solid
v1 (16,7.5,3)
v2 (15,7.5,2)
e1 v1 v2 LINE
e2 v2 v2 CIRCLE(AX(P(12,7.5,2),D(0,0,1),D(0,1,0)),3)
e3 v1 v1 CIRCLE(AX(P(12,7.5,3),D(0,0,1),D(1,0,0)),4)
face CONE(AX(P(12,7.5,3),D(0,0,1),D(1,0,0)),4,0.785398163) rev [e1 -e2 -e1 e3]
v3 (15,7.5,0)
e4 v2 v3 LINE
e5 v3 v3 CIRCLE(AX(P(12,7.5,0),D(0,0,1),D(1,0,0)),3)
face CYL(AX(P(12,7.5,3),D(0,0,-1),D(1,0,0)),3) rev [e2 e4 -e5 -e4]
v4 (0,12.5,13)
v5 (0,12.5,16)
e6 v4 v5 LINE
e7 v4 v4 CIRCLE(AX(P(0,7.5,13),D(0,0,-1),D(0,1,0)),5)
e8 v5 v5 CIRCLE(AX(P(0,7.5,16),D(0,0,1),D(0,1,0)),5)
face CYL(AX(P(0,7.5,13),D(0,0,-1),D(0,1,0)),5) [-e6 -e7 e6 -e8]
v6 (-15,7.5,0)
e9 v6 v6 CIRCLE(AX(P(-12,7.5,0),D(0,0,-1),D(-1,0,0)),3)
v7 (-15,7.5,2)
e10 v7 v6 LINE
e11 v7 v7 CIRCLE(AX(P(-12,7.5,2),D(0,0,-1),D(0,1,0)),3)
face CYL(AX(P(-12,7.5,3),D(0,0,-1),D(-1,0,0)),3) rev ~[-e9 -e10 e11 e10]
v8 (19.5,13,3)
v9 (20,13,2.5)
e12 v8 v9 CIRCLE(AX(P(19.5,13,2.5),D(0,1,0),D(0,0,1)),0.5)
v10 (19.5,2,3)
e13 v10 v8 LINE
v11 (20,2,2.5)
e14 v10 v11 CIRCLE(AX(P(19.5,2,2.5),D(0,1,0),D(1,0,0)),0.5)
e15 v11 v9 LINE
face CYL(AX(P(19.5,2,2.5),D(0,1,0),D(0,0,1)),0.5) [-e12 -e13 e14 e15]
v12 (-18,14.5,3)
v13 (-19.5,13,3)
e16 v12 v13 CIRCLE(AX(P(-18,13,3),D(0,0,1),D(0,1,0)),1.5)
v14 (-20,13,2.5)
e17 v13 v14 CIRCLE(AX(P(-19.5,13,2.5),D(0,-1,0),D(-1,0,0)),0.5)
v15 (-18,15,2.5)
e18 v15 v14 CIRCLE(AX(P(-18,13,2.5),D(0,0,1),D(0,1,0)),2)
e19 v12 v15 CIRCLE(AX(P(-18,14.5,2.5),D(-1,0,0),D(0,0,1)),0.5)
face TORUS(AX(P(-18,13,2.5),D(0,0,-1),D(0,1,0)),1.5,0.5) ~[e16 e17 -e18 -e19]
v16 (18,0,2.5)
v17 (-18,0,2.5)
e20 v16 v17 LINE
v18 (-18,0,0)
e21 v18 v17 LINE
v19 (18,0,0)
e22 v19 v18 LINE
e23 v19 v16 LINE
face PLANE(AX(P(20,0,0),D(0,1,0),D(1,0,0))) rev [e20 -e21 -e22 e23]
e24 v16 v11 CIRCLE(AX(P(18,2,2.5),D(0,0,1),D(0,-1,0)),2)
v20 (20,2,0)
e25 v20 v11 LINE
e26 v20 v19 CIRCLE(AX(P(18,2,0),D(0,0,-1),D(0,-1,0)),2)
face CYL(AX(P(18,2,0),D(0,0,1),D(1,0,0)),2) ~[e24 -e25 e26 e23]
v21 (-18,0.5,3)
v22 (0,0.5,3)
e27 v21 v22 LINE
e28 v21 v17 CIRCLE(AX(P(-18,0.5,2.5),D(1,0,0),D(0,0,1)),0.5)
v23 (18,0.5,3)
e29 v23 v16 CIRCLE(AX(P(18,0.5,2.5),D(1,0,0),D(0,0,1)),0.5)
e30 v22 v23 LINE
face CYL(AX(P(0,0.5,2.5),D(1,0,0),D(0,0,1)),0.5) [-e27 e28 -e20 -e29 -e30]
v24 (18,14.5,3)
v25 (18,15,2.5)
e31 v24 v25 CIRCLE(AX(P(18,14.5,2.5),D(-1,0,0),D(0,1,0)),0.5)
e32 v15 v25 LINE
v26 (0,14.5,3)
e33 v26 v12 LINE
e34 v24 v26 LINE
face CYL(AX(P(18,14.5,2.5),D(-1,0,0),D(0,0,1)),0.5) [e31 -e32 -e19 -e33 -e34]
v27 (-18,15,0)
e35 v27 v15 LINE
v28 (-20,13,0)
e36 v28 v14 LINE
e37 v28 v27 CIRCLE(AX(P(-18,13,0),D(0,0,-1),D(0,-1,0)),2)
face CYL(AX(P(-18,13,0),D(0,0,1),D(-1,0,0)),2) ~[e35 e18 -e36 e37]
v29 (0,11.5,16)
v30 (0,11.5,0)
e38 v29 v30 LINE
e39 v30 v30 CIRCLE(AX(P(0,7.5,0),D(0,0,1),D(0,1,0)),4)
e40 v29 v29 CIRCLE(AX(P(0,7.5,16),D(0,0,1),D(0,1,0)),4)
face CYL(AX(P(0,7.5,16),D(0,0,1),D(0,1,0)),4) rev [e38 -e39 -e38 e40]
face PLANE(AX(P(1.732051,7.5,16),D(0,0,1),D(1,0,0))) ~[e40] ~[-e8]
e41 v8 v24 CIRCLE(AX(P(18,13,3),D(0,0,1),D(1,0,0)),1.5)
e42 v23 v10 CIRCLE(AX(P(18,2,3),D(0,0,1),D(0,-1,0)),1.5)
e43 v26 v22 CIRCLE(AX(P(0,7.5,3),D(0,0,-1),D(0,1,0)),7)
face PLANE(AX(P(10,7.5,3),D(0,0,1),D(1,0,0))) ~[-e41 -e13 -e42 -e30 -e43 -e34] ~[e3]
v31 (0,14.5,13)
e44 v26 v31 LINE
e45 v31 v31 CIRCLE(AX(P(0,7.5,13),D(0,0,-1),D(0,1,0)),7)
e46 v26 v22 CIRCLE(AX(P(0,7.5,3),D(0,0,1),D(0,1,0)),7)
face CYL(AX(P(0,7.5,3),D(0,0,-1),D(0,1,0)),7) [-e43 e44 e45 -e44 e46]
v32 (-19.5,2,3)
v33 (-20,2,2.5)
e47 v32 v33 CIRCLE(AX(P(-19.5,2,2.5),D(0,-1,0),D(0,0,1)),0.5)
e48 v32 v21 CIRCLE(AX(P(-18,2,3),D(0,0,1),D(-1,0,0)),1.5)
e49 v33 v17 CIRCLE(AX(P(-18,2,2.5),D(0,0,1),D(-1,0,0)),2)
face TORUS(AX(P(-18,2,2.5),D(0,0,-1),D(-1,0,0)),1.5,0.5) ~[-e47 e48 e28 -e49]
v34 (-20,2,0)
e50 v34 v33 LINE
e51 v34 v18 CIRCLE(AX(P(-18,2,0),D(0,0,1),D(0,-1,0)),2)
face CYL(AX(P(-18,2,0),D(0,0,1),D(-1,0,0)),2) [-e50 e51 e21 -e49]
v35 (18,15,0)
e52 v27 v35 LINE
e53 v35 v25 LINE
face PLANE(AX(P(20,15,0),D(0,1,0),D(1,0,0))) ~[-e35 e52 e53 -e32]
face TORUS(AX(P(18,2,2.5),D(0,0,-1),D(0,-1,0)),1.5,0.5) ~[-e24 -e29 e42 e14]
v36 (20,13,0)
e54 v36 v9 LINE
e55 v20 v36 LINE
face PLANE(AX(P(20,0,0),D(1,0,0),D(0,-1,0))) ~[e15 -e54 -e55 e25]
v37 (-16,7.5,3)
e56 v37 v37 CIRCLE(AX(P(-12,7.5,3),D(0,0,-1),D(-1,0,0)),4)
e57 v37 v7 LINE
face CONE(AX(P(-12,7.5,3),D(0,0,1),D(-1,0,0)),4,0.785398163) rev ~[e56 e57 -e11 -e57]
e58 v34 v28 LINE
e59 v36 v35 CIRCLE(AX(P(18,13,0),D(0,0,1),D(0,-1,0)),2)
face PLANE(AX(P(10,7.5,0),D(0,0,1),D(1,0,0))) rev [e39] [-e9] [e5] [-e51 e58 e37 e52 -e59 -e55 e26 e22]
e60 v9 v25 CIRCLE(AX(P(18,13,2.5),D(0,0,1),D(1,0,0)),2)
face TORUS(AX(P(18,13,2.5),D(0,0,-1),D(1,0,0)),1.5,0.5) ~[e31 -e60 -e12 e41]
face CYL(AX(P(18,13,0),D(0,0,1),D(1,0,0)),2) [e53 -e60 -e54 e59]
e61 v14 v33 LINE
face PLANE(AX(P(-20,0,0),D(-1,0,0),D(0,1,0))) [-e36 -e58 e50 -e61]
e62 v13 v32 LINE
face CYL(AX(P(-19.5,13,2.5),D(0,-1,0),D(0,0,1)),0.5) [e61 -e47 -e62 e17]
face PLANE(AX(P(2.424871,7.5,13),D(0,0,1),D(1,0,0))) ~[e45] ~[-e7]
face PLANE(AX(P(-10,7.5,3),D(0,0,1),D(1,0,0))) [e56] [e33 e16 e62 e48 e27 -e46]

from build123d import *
from build123d import SkipClean  # not in build123d's __all__

# Parameters (mm, degrees)
F0_W           = 20
F0_H           = 15
F1_DEPTH       = 3
F3_DEPTH       = 10
F5_DEPTH       = 3
F7_DEPTH       = 25
F9_D           = 6
F9_CSINK_D     = 8
F9_CSINK_ANGLE = 90
F10_R          = 2
F12_R          = 0.5


with BuildPart() as f1:
    # F0 (on Top) → F1 (new body)
    with BuildSketch(Plane.XY):
        with Locations((-10, 7.5)):
            Rectangle(F0_W, F0_H)
    extrude(amount=F1_DEPTH)

    # F2 (on face) → F3 (join)
    with BuildSketch(Plane.XY.offset(3)):
        with BuildLine():
            Line((0, 0.5), (0, 14.5))
            ThreePointArc((0, 14.5), (-7, 7.5), (0, 0.5))
        make_face()
    extrude(amount=F3_DEPTH)

    # F4 (on face) → F5 (join)
    with BuildSketch(Plane.XY.offset(13)):
        with BuildLine():
            Line((0, 2.5), (0, 12.5))
            ThreePointArc((0, 12.5), (-5, 7.5), (0, 2.5))
        make_face()
    extrude(amount=F5_DEPTH)

    # F6 (on face) → F7 (cut)
    with BuildSketch(Plane.XY.offset(16)):
        with BuildLine():
            Line((0, 3.5), (0, 11.5))
            ThreePointArc((0, 11.5), (-4, 7.5), (0, 3.5))
        make_face()
    extrude(amount=-F7_DEPTH, mode=Mode.SUBTRACT)

    # F9 (through all)
    with Locations(Plane.XY.offset(3)):
        with Locations((-12, 7.5)):
            CounterSinkHole(F9_D / 2, F9_CSINK_D / 2, counter_sink_angle=F9_CSINK_ANGLE)

    # F10
    f10_edges = [f1.edges().sort_by_distance(p)[0] for p in [
        (-20, 0, 1.5),
        (-20, 15, 1.5),
    ]]
    fillet(f10_edges, radius=F10_R)

    # F11: F1 across plane


with BuildPart() as f1_1:
    add(f1.part, clean=False)
    with SkipClean():  # cleaning this boolean's faces spoils the solid; the shape is the same uncleaned
        add(f1.part.mirror(Plane.YZ), clean=False)

    # F12
    f12_edges = [f1_1.edges().sort_by_distance(p)[0] for p in [
        (-9, 0, 3),
        (9, 0, 3),
    ]]
    fillet(f12_edges, radius=F12_R)


solid = f1_1.part
